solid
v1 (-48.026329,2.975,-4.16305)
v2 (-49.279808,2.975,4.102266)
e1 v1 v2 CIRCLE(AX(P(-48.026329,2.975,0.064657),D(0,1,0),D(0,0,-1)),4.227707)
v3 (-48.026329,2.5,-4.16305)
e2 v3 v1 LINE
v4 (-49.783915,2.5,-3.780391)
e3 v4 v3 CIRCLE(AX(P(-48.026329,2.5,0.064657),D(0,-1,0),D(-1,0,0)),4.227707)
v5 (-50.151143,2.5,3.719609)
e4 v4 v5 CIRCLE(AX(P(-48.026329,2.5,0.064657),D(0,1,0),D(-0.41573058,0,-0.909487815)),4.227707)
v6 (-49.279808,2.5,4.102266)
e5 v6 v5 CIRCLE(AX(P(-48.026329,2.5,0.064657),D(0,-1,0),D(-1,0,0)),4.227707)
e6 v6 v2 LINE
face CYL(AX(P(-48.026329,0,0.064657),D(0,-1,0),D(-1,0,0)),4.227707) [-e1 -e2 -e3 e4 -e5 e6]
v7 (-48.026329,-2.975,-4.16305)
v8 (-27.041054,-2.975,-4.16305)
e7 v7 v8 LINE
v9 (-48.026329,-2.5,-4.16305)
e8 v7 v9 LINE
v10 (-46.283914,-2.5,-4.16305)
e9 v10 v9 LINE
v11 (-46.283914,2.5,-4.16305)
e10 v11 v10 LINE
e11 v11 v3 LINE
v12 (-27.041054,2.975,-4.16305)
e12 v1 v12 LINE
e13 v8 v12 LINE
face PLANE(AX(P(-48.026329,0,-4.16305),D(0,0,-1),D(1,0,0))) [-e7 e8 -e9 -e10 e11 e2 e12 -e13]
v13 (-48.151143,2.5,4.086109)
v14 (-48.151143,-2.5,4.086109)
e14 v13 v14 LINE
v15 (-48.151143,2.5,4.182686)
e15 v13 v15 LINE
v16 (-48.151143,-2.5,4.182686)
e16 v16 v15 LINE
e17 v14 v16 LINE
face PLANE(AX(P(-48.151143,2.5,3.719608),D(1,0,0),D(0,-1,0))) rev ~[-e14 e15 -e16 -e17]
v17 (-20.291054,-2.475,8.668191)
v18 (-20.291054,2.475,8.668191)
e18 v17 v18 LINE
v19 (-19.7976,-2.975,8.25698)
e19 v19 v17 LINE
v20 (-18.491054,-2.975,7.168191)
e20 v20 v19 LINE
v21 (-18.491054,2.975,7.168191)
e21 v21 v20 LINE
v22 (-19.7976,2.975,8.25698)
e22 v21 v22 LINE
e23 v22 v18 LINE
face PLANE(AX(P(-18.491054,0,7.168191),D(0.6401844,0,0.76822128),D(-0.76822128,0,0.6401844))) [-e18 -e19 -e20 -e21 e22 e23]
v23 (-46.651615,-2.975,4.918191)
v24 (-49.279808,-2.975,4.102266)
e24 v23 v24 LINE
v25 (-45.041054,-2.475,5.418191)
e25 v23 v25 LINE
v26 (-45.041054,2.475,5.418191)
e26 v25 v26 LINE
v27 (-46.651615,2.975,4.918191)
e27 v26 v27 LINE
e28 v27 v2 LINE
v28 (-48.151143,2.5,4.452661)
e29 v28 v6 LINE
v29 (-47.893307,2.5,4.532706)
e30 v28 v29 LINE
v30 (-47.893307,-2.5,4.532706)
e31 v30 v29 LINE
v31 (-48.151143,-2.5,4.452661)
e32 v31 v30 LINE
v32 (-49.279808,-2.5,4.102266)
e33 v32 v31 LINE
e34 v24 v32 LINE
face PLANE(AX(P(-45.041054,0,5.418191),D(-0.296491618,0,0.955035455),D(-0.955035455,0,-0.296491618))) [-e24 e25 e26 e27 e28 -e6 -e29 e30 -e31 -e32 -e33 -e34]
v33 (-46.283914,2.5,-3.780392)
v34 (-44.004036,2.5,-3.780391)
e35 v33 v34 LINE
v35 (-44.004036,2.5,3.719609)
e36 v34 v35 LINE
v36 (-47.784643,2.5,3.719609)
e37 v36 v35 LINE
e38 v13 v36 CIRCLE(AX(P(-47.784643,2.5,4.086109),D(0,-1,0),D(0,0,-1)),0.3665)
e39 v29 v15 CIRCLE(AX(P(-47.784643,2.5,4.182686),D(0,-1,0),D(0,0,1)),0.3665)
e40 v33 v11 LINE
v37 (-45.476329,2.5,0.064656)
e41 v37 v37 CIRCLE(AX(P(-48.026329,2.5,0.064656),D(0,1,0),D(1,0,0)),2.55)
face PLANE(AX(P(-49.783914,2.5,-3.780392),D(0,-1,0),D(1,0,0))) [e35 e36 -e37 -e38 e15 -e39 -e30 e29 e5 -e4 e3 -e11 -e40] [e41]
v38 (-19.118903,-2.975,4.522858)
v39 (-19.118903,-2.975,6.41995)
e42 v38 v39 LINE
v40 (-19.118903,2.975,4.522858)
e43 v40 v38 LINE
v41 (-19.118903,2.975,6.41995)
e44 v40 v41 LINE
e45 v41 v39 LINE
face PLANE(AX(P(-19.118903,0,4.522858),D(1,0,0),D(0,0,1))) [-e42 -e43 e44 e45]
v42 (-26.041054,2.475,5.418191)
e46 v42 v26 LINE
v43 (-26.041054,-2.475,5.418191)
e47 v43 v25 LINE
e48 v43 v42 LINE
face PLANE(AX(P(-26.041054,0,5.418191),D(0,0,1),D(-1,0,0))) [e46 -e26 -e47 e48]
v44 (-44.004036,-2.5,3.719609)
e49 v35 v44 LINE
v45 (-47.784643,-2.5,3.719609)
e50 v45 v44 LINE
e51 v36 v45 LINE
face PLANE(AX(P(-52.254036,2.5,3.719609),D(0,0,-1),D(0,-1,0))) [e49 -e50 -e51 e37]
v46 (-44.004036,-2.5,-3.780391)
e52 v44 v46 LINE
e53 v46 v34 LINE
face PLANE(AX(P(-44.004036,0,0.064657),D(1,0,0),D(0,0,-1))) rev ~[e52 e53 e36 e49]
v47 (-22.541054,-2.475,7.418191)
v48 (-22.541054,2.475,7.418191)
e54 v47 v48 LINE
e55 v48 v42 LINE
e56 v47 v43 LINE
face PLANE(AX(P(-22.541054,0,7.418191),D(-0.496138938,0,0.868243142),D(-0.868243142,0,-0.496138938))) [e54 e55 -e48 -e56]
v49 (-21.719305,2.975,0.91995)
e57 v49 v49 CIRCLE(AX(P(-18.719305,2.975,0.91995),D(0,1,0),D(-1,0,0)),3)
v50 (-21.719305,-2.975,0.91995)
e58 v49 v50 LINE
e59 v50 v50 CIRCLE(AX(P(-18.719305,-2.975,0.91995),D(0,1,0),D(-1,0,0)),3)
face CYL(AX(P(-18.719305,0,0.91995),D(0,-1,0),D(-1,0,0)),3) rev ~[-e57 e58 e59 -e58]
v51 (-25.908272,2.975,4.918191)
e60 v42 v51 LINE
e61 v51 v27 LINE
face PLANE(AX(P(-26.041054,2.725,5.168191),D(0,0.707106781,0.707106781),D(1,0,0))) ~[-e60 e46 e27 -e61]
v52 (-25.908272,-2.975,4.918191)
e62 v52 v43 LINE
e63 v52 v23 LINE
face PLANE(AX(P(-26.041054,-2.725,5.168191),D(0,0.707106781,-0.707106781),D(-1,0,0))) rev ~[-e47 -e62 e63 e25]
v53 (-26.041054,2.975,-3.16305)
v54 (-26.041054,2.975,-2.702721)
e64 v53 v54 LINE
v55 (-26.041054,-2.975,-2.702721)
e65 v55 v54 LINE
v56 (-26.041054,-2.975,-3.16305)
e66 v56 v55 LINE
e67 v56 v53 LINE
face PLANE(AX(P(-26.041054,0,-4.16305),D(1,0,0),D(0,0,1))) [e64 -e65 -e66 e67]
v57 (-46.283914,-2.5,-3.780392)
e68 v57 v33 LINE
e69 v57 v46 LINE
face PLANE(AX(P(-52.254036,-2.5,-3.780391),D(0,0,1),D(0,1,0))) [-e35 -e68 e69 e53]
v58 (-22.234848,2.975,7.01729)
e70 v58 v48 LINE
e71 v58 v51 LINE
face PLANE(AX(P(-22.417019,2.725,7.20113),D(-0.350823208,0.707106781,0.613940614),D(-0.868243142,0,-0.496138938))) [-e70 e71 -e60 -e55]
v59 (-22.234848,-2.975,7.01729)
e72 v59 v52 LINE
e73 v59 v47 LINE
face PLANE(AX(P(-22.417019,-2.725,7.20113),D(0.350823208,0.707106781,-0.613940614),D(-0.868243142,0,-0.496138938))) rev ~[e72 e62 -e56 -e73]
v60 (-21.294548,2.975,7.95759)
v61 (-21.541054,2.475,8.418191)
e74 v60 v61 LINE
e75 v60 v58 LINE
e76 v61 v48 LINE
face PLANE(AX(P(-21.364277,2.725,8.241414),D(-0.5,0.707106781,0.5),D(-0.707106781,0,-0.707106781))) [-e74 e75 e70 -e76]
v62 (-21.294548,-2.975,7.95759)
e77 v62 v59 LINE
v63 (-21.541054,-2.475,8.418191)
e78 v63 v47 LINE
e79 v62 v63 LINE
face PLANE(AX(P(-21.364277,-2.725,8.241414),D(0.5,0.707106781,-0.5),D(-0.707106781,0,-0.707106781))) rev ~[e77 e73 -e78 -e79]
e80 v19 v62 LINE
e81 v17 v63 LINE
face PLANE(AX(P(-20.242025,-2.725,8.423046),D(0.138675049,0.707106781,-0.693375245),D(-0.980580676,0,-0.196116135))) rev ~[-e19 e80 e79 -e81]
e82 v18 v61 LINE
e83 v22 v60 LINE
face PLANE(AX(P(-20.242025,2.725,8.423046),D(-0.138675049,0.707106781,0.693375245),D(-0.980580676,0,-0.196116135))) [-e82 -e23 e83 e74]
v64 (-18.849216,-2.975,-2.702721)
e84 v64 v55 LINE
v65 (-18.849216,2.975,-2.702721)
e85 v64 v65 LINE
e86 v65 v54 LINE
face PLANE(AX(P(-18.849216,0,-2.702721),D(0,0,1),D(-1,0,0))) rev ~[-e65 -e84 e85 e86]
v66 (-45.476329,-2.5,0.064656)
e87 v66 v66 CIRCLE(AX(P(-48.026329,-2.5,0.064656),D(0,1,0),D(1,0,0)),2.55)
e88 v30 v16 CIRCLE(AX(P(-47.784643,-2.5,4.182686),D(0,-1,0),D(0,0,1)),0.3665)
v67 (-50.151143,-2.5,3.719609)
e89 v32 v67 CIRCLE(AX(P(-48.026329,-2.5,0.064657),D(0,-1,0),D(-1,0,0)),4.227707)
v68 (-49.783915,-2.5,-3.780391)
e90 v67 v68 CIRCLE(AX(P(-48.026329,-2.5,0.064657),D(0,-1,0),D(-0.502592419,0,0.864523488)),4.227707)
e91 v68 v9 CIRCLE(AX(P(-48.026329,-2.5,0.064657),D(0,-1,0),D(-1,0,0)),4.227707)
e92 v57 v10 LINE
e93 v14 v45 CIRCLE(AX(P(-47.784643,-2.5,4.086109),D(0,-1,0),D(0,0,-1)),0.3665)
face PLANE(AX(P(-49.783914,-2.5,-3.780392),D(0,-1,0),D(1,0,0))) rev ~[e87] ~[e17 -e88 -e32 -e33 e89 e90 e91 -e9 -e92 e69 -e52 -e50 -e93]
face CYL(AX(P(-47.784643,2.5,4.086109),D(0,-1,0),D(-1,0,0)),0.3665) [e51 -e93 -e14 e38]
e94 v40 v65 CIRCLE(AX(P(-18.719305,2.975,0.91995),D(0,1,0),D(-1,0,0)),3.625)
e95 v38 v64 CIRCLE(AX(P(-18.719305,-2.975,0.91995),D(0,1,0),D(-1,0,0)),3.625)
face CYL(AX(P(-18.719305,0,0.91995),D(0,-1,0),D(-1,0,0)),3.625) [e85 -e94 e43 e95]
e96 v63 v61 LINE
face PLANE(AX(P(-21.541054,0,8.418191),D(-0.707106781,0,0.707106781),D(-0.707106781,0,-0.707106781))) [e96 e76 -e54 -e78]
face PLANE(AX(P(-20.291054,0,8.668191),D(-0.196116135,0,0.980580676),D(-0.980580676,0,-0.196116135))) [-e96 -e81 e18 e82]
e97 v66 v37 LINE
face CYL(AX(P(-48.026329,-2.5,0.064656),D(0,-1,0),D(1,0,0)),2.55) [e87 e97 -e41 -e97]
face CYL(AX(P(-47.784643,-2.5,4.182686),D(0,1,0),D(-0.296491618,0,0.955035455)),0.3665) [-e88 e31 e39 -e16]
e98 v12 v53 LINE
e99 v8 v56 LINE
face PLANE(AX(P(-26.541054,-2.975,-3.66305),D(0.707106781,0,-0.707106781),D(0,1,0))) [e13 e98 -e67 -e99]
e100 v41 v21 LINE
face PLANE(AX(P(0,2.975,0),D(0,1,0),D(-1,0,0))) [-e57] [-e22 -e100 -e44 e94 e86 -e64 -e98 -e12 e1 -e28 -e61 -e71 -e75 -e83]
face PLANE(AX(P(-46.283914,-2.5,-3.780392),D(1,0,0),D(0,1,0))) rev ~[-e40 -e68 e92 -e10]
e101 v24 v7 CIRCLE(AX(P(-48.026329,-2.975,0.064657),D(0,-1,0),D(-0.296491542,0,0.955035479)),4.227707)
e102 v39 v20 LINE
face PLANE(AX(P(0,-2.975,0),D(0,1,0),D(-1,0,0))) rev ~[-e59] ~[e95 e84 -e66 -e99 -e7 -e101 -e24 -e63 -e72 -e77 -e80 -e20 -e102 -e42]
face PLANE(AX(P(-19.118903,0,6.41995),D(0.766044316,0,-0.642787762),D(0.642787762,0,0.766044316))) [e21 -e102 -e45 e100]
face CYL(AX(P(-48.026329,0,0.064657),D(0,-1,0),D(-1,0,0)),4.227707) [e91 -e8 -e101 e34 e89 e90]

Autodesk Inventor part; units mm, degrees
ref_plane "YZ Plane" through (0, 0, 0) normal (1, 0, 0) x (0, 1, 0)
ref_plane "XZ Plane" through (0, 0, 0) normal (0, 1, 0) x (-1, 0, 0)
sketch "Sketch1" plane through (0, 0, 0) normal (0, 1, 0) x (-1, 0, 0)
  circle A0 centre (18.719305, 0.91995) radius 3.625
  line L0 (19.118903, 4.522858) -> (19.118903, 6.41995)
  line L1 (19.118903, 6.41995) -> (18.491054, 7.168191)
  line L2 (18.491054, 7.168191) -> (20.291054, 8.668191)
  line L3 (20.291054, 8.668191) -> (21.541054, 8.418191)
  line L4 (21.541054, 8.418191) -> (22.541054, 7.418191)
  line L5 (22.541054, 7.418191) -> (26.041054, 5.418191)
  line L6 (26.041054, -4.16305) -> (26.041054, 5.418191)
  line L7 (26.041054, 5.418191) -> (45.041054, 5.418191)
  line L8 (45.041054, 5.418191) -> (49.279808, 4.102266)
  line L9 (18.849216, -2.702721) -> (26.041054, -2.702721)
  circle A1 centre (48.026329, 0.064657) radius 4.227707
  line L10 (48.026329, -4.16305) -> (26.041054, -4.16305)
  circle A2 centre (18.719305, 0.91995) radius 3
  point P0 (0, 0)
  dimension "d0" = 7.25
  dimension "d1" = 5.5
  dimension "d2" = 140
  dimension "d3" = 1.5
  dimension "d4" = 1.8
  dimension "d5" = 1.25
  dimension "d6" = 0.25
  dimension "d7" = 1
  dimension "d8" = 1
  dimension "d9" = 3.5
  dimension "d10" = 2
  dimension "d11" = 19
  dimension "d12" = 6
  dimension "d15" = 5.083
extrude "Extrusion1" add sketch "Sketch1" along normal mid plane 5.95
ref_plane "Work Plane1" through (-52.254036, 0, 0.064657) normal (1, 0, 0) x (0, 0, -1)
sketch "Sketch2" plane through (-52.254036, 0, 0.064657) normal (1, 0, 0) x (0, 0, -1)
  point P0 (0.064657, 0)
sketch "Sketch3" plane through (-52.254036, 0, 0.064657) normal (1, 0, 0) x (0, 0, -1)
  line L0 (-4.03761, -2.975) -> (4.227707, -2.975) construction
  line L1 (4.227707, 2.975) -> (-4.03761, 2.975) construction
  line L2 (-4.03761, -2.975) -> (-4.03761, 2.975) construction
  line L3 (2.767378, 2.975) -> (4.227707, 2.975) construction
  line L4 (-4.03761, -2.975) -> (4.227707, 2.975) construction
  line L5 (4.227707, -2.975) -> (4.227707, 2.975) construction
  line L6 (4.227707, -2.975) -> (0.095048, 0) construction
  line L7 (-3.654952, -2.5) -> (3.845048, -2.5)
  line L8 (3.845048, -2.5) -> (3.845048, 2.5)
  line L9 (3.845048, 2.5) -> (-3.654952, 2.5)
  line L10 (-3.654952, 2.5) -> (-3.654952, -2.5)
  line L11 (-3.654952, -2.5) -> (3.845048, 2.5) construction
  line L12 (3.845048, -2.5) -> (-3.654952, 2.5) construction
  point P0 (0.064657, 0)
  dimension "d16" = 7.5
  dimension "d17" = 5
extrude "Extrusion2" cut sketch "Sketch3" along normal blind 8.25
sketch "Sketch4" plane through (-50.151142, -2.5, 3.719608) normal (0, 1, 0) x (1, 0, 0)
  arc A0 (2.124813, 7.882658) -> (0.871334, -0.382658) centre (2.124813, 3.654952) ccw
  circle A1 centre (2.124813, 3.654952) radius 2.55
  point P0 (50.151142, 3.719608)
  dimension "d20" = 5.1
extrude "Extrusion3" add sketch "Sketch4" along normal up to surface (5 mm away)
sketch "Sketch5" plane through (-49.783914, -2.5, -3.780392) normal (0, 0, 1) x (1, 0, 0)
  line L0 (0, 0) -> (0, 5) projected
  line L1 (0, 0) -> (3.5, 0)
  line L2 (3.5, 0) -> (3.5, 5)
  line L3 (0, 5) -> (3.5, 5)
  point P0 (49.783914, 2.5)
  point P1 (3.5, 0.293722)
  dimension "d23" = 3.5
extrude "Extrusion4" cut sketch "Sketch5" against normal blind 4.25
sketch "Sketch6" plane through (-44.004036, 2.5, 3.719608) normal (0, 0, -1) x (-1, 0, 0)
  line L0 (6.147107, 0) -> (0, 0)
  line L1 (6.147107, 0) -> (4.147107, 0)
  line L2 (4.147107, 0) -> (4.147107, -5)
  line L3 (4.147107, -5) -> (6.147107, -5)
  line L4 (6.147107, -5) -> (6.147107, 0)
  line L5 (6.147107, -5) -> (0, -5)
  point P0 (-44.004036, -2.5)
  point P1 (4.147107, 0)
  dimension "d26" = 2
extrude "Extrusion5" cut sketch "Sketch6" against normal blind 4.25
fillet "Fillet1" radius 0.3665 2 edges at (-48.1511, 0, 4.4527) (-48.1511, 0, 3.7196)
chamfer "Chamfer1" distance 0.5 angle 45 8 edges at (-35.5411, -2.975, 5.4182) (-35.5411, 2.975, 5.4182) (-24.2911, 2.975, 6.4182) (-24.2911, -2.975, 6.4182) (-22.0411, -2.975, 7.9182) (-22.0411, 2.975, 7.9182) (-20.9161, 2.975, 8.5432) (-20.9161, -2.975, 8.5432)
chamfer "Chamfer2" distance 1 angle 45 1 edges at (-26.0411, 0, -4.1631)
properties part number "Lower Leg"
